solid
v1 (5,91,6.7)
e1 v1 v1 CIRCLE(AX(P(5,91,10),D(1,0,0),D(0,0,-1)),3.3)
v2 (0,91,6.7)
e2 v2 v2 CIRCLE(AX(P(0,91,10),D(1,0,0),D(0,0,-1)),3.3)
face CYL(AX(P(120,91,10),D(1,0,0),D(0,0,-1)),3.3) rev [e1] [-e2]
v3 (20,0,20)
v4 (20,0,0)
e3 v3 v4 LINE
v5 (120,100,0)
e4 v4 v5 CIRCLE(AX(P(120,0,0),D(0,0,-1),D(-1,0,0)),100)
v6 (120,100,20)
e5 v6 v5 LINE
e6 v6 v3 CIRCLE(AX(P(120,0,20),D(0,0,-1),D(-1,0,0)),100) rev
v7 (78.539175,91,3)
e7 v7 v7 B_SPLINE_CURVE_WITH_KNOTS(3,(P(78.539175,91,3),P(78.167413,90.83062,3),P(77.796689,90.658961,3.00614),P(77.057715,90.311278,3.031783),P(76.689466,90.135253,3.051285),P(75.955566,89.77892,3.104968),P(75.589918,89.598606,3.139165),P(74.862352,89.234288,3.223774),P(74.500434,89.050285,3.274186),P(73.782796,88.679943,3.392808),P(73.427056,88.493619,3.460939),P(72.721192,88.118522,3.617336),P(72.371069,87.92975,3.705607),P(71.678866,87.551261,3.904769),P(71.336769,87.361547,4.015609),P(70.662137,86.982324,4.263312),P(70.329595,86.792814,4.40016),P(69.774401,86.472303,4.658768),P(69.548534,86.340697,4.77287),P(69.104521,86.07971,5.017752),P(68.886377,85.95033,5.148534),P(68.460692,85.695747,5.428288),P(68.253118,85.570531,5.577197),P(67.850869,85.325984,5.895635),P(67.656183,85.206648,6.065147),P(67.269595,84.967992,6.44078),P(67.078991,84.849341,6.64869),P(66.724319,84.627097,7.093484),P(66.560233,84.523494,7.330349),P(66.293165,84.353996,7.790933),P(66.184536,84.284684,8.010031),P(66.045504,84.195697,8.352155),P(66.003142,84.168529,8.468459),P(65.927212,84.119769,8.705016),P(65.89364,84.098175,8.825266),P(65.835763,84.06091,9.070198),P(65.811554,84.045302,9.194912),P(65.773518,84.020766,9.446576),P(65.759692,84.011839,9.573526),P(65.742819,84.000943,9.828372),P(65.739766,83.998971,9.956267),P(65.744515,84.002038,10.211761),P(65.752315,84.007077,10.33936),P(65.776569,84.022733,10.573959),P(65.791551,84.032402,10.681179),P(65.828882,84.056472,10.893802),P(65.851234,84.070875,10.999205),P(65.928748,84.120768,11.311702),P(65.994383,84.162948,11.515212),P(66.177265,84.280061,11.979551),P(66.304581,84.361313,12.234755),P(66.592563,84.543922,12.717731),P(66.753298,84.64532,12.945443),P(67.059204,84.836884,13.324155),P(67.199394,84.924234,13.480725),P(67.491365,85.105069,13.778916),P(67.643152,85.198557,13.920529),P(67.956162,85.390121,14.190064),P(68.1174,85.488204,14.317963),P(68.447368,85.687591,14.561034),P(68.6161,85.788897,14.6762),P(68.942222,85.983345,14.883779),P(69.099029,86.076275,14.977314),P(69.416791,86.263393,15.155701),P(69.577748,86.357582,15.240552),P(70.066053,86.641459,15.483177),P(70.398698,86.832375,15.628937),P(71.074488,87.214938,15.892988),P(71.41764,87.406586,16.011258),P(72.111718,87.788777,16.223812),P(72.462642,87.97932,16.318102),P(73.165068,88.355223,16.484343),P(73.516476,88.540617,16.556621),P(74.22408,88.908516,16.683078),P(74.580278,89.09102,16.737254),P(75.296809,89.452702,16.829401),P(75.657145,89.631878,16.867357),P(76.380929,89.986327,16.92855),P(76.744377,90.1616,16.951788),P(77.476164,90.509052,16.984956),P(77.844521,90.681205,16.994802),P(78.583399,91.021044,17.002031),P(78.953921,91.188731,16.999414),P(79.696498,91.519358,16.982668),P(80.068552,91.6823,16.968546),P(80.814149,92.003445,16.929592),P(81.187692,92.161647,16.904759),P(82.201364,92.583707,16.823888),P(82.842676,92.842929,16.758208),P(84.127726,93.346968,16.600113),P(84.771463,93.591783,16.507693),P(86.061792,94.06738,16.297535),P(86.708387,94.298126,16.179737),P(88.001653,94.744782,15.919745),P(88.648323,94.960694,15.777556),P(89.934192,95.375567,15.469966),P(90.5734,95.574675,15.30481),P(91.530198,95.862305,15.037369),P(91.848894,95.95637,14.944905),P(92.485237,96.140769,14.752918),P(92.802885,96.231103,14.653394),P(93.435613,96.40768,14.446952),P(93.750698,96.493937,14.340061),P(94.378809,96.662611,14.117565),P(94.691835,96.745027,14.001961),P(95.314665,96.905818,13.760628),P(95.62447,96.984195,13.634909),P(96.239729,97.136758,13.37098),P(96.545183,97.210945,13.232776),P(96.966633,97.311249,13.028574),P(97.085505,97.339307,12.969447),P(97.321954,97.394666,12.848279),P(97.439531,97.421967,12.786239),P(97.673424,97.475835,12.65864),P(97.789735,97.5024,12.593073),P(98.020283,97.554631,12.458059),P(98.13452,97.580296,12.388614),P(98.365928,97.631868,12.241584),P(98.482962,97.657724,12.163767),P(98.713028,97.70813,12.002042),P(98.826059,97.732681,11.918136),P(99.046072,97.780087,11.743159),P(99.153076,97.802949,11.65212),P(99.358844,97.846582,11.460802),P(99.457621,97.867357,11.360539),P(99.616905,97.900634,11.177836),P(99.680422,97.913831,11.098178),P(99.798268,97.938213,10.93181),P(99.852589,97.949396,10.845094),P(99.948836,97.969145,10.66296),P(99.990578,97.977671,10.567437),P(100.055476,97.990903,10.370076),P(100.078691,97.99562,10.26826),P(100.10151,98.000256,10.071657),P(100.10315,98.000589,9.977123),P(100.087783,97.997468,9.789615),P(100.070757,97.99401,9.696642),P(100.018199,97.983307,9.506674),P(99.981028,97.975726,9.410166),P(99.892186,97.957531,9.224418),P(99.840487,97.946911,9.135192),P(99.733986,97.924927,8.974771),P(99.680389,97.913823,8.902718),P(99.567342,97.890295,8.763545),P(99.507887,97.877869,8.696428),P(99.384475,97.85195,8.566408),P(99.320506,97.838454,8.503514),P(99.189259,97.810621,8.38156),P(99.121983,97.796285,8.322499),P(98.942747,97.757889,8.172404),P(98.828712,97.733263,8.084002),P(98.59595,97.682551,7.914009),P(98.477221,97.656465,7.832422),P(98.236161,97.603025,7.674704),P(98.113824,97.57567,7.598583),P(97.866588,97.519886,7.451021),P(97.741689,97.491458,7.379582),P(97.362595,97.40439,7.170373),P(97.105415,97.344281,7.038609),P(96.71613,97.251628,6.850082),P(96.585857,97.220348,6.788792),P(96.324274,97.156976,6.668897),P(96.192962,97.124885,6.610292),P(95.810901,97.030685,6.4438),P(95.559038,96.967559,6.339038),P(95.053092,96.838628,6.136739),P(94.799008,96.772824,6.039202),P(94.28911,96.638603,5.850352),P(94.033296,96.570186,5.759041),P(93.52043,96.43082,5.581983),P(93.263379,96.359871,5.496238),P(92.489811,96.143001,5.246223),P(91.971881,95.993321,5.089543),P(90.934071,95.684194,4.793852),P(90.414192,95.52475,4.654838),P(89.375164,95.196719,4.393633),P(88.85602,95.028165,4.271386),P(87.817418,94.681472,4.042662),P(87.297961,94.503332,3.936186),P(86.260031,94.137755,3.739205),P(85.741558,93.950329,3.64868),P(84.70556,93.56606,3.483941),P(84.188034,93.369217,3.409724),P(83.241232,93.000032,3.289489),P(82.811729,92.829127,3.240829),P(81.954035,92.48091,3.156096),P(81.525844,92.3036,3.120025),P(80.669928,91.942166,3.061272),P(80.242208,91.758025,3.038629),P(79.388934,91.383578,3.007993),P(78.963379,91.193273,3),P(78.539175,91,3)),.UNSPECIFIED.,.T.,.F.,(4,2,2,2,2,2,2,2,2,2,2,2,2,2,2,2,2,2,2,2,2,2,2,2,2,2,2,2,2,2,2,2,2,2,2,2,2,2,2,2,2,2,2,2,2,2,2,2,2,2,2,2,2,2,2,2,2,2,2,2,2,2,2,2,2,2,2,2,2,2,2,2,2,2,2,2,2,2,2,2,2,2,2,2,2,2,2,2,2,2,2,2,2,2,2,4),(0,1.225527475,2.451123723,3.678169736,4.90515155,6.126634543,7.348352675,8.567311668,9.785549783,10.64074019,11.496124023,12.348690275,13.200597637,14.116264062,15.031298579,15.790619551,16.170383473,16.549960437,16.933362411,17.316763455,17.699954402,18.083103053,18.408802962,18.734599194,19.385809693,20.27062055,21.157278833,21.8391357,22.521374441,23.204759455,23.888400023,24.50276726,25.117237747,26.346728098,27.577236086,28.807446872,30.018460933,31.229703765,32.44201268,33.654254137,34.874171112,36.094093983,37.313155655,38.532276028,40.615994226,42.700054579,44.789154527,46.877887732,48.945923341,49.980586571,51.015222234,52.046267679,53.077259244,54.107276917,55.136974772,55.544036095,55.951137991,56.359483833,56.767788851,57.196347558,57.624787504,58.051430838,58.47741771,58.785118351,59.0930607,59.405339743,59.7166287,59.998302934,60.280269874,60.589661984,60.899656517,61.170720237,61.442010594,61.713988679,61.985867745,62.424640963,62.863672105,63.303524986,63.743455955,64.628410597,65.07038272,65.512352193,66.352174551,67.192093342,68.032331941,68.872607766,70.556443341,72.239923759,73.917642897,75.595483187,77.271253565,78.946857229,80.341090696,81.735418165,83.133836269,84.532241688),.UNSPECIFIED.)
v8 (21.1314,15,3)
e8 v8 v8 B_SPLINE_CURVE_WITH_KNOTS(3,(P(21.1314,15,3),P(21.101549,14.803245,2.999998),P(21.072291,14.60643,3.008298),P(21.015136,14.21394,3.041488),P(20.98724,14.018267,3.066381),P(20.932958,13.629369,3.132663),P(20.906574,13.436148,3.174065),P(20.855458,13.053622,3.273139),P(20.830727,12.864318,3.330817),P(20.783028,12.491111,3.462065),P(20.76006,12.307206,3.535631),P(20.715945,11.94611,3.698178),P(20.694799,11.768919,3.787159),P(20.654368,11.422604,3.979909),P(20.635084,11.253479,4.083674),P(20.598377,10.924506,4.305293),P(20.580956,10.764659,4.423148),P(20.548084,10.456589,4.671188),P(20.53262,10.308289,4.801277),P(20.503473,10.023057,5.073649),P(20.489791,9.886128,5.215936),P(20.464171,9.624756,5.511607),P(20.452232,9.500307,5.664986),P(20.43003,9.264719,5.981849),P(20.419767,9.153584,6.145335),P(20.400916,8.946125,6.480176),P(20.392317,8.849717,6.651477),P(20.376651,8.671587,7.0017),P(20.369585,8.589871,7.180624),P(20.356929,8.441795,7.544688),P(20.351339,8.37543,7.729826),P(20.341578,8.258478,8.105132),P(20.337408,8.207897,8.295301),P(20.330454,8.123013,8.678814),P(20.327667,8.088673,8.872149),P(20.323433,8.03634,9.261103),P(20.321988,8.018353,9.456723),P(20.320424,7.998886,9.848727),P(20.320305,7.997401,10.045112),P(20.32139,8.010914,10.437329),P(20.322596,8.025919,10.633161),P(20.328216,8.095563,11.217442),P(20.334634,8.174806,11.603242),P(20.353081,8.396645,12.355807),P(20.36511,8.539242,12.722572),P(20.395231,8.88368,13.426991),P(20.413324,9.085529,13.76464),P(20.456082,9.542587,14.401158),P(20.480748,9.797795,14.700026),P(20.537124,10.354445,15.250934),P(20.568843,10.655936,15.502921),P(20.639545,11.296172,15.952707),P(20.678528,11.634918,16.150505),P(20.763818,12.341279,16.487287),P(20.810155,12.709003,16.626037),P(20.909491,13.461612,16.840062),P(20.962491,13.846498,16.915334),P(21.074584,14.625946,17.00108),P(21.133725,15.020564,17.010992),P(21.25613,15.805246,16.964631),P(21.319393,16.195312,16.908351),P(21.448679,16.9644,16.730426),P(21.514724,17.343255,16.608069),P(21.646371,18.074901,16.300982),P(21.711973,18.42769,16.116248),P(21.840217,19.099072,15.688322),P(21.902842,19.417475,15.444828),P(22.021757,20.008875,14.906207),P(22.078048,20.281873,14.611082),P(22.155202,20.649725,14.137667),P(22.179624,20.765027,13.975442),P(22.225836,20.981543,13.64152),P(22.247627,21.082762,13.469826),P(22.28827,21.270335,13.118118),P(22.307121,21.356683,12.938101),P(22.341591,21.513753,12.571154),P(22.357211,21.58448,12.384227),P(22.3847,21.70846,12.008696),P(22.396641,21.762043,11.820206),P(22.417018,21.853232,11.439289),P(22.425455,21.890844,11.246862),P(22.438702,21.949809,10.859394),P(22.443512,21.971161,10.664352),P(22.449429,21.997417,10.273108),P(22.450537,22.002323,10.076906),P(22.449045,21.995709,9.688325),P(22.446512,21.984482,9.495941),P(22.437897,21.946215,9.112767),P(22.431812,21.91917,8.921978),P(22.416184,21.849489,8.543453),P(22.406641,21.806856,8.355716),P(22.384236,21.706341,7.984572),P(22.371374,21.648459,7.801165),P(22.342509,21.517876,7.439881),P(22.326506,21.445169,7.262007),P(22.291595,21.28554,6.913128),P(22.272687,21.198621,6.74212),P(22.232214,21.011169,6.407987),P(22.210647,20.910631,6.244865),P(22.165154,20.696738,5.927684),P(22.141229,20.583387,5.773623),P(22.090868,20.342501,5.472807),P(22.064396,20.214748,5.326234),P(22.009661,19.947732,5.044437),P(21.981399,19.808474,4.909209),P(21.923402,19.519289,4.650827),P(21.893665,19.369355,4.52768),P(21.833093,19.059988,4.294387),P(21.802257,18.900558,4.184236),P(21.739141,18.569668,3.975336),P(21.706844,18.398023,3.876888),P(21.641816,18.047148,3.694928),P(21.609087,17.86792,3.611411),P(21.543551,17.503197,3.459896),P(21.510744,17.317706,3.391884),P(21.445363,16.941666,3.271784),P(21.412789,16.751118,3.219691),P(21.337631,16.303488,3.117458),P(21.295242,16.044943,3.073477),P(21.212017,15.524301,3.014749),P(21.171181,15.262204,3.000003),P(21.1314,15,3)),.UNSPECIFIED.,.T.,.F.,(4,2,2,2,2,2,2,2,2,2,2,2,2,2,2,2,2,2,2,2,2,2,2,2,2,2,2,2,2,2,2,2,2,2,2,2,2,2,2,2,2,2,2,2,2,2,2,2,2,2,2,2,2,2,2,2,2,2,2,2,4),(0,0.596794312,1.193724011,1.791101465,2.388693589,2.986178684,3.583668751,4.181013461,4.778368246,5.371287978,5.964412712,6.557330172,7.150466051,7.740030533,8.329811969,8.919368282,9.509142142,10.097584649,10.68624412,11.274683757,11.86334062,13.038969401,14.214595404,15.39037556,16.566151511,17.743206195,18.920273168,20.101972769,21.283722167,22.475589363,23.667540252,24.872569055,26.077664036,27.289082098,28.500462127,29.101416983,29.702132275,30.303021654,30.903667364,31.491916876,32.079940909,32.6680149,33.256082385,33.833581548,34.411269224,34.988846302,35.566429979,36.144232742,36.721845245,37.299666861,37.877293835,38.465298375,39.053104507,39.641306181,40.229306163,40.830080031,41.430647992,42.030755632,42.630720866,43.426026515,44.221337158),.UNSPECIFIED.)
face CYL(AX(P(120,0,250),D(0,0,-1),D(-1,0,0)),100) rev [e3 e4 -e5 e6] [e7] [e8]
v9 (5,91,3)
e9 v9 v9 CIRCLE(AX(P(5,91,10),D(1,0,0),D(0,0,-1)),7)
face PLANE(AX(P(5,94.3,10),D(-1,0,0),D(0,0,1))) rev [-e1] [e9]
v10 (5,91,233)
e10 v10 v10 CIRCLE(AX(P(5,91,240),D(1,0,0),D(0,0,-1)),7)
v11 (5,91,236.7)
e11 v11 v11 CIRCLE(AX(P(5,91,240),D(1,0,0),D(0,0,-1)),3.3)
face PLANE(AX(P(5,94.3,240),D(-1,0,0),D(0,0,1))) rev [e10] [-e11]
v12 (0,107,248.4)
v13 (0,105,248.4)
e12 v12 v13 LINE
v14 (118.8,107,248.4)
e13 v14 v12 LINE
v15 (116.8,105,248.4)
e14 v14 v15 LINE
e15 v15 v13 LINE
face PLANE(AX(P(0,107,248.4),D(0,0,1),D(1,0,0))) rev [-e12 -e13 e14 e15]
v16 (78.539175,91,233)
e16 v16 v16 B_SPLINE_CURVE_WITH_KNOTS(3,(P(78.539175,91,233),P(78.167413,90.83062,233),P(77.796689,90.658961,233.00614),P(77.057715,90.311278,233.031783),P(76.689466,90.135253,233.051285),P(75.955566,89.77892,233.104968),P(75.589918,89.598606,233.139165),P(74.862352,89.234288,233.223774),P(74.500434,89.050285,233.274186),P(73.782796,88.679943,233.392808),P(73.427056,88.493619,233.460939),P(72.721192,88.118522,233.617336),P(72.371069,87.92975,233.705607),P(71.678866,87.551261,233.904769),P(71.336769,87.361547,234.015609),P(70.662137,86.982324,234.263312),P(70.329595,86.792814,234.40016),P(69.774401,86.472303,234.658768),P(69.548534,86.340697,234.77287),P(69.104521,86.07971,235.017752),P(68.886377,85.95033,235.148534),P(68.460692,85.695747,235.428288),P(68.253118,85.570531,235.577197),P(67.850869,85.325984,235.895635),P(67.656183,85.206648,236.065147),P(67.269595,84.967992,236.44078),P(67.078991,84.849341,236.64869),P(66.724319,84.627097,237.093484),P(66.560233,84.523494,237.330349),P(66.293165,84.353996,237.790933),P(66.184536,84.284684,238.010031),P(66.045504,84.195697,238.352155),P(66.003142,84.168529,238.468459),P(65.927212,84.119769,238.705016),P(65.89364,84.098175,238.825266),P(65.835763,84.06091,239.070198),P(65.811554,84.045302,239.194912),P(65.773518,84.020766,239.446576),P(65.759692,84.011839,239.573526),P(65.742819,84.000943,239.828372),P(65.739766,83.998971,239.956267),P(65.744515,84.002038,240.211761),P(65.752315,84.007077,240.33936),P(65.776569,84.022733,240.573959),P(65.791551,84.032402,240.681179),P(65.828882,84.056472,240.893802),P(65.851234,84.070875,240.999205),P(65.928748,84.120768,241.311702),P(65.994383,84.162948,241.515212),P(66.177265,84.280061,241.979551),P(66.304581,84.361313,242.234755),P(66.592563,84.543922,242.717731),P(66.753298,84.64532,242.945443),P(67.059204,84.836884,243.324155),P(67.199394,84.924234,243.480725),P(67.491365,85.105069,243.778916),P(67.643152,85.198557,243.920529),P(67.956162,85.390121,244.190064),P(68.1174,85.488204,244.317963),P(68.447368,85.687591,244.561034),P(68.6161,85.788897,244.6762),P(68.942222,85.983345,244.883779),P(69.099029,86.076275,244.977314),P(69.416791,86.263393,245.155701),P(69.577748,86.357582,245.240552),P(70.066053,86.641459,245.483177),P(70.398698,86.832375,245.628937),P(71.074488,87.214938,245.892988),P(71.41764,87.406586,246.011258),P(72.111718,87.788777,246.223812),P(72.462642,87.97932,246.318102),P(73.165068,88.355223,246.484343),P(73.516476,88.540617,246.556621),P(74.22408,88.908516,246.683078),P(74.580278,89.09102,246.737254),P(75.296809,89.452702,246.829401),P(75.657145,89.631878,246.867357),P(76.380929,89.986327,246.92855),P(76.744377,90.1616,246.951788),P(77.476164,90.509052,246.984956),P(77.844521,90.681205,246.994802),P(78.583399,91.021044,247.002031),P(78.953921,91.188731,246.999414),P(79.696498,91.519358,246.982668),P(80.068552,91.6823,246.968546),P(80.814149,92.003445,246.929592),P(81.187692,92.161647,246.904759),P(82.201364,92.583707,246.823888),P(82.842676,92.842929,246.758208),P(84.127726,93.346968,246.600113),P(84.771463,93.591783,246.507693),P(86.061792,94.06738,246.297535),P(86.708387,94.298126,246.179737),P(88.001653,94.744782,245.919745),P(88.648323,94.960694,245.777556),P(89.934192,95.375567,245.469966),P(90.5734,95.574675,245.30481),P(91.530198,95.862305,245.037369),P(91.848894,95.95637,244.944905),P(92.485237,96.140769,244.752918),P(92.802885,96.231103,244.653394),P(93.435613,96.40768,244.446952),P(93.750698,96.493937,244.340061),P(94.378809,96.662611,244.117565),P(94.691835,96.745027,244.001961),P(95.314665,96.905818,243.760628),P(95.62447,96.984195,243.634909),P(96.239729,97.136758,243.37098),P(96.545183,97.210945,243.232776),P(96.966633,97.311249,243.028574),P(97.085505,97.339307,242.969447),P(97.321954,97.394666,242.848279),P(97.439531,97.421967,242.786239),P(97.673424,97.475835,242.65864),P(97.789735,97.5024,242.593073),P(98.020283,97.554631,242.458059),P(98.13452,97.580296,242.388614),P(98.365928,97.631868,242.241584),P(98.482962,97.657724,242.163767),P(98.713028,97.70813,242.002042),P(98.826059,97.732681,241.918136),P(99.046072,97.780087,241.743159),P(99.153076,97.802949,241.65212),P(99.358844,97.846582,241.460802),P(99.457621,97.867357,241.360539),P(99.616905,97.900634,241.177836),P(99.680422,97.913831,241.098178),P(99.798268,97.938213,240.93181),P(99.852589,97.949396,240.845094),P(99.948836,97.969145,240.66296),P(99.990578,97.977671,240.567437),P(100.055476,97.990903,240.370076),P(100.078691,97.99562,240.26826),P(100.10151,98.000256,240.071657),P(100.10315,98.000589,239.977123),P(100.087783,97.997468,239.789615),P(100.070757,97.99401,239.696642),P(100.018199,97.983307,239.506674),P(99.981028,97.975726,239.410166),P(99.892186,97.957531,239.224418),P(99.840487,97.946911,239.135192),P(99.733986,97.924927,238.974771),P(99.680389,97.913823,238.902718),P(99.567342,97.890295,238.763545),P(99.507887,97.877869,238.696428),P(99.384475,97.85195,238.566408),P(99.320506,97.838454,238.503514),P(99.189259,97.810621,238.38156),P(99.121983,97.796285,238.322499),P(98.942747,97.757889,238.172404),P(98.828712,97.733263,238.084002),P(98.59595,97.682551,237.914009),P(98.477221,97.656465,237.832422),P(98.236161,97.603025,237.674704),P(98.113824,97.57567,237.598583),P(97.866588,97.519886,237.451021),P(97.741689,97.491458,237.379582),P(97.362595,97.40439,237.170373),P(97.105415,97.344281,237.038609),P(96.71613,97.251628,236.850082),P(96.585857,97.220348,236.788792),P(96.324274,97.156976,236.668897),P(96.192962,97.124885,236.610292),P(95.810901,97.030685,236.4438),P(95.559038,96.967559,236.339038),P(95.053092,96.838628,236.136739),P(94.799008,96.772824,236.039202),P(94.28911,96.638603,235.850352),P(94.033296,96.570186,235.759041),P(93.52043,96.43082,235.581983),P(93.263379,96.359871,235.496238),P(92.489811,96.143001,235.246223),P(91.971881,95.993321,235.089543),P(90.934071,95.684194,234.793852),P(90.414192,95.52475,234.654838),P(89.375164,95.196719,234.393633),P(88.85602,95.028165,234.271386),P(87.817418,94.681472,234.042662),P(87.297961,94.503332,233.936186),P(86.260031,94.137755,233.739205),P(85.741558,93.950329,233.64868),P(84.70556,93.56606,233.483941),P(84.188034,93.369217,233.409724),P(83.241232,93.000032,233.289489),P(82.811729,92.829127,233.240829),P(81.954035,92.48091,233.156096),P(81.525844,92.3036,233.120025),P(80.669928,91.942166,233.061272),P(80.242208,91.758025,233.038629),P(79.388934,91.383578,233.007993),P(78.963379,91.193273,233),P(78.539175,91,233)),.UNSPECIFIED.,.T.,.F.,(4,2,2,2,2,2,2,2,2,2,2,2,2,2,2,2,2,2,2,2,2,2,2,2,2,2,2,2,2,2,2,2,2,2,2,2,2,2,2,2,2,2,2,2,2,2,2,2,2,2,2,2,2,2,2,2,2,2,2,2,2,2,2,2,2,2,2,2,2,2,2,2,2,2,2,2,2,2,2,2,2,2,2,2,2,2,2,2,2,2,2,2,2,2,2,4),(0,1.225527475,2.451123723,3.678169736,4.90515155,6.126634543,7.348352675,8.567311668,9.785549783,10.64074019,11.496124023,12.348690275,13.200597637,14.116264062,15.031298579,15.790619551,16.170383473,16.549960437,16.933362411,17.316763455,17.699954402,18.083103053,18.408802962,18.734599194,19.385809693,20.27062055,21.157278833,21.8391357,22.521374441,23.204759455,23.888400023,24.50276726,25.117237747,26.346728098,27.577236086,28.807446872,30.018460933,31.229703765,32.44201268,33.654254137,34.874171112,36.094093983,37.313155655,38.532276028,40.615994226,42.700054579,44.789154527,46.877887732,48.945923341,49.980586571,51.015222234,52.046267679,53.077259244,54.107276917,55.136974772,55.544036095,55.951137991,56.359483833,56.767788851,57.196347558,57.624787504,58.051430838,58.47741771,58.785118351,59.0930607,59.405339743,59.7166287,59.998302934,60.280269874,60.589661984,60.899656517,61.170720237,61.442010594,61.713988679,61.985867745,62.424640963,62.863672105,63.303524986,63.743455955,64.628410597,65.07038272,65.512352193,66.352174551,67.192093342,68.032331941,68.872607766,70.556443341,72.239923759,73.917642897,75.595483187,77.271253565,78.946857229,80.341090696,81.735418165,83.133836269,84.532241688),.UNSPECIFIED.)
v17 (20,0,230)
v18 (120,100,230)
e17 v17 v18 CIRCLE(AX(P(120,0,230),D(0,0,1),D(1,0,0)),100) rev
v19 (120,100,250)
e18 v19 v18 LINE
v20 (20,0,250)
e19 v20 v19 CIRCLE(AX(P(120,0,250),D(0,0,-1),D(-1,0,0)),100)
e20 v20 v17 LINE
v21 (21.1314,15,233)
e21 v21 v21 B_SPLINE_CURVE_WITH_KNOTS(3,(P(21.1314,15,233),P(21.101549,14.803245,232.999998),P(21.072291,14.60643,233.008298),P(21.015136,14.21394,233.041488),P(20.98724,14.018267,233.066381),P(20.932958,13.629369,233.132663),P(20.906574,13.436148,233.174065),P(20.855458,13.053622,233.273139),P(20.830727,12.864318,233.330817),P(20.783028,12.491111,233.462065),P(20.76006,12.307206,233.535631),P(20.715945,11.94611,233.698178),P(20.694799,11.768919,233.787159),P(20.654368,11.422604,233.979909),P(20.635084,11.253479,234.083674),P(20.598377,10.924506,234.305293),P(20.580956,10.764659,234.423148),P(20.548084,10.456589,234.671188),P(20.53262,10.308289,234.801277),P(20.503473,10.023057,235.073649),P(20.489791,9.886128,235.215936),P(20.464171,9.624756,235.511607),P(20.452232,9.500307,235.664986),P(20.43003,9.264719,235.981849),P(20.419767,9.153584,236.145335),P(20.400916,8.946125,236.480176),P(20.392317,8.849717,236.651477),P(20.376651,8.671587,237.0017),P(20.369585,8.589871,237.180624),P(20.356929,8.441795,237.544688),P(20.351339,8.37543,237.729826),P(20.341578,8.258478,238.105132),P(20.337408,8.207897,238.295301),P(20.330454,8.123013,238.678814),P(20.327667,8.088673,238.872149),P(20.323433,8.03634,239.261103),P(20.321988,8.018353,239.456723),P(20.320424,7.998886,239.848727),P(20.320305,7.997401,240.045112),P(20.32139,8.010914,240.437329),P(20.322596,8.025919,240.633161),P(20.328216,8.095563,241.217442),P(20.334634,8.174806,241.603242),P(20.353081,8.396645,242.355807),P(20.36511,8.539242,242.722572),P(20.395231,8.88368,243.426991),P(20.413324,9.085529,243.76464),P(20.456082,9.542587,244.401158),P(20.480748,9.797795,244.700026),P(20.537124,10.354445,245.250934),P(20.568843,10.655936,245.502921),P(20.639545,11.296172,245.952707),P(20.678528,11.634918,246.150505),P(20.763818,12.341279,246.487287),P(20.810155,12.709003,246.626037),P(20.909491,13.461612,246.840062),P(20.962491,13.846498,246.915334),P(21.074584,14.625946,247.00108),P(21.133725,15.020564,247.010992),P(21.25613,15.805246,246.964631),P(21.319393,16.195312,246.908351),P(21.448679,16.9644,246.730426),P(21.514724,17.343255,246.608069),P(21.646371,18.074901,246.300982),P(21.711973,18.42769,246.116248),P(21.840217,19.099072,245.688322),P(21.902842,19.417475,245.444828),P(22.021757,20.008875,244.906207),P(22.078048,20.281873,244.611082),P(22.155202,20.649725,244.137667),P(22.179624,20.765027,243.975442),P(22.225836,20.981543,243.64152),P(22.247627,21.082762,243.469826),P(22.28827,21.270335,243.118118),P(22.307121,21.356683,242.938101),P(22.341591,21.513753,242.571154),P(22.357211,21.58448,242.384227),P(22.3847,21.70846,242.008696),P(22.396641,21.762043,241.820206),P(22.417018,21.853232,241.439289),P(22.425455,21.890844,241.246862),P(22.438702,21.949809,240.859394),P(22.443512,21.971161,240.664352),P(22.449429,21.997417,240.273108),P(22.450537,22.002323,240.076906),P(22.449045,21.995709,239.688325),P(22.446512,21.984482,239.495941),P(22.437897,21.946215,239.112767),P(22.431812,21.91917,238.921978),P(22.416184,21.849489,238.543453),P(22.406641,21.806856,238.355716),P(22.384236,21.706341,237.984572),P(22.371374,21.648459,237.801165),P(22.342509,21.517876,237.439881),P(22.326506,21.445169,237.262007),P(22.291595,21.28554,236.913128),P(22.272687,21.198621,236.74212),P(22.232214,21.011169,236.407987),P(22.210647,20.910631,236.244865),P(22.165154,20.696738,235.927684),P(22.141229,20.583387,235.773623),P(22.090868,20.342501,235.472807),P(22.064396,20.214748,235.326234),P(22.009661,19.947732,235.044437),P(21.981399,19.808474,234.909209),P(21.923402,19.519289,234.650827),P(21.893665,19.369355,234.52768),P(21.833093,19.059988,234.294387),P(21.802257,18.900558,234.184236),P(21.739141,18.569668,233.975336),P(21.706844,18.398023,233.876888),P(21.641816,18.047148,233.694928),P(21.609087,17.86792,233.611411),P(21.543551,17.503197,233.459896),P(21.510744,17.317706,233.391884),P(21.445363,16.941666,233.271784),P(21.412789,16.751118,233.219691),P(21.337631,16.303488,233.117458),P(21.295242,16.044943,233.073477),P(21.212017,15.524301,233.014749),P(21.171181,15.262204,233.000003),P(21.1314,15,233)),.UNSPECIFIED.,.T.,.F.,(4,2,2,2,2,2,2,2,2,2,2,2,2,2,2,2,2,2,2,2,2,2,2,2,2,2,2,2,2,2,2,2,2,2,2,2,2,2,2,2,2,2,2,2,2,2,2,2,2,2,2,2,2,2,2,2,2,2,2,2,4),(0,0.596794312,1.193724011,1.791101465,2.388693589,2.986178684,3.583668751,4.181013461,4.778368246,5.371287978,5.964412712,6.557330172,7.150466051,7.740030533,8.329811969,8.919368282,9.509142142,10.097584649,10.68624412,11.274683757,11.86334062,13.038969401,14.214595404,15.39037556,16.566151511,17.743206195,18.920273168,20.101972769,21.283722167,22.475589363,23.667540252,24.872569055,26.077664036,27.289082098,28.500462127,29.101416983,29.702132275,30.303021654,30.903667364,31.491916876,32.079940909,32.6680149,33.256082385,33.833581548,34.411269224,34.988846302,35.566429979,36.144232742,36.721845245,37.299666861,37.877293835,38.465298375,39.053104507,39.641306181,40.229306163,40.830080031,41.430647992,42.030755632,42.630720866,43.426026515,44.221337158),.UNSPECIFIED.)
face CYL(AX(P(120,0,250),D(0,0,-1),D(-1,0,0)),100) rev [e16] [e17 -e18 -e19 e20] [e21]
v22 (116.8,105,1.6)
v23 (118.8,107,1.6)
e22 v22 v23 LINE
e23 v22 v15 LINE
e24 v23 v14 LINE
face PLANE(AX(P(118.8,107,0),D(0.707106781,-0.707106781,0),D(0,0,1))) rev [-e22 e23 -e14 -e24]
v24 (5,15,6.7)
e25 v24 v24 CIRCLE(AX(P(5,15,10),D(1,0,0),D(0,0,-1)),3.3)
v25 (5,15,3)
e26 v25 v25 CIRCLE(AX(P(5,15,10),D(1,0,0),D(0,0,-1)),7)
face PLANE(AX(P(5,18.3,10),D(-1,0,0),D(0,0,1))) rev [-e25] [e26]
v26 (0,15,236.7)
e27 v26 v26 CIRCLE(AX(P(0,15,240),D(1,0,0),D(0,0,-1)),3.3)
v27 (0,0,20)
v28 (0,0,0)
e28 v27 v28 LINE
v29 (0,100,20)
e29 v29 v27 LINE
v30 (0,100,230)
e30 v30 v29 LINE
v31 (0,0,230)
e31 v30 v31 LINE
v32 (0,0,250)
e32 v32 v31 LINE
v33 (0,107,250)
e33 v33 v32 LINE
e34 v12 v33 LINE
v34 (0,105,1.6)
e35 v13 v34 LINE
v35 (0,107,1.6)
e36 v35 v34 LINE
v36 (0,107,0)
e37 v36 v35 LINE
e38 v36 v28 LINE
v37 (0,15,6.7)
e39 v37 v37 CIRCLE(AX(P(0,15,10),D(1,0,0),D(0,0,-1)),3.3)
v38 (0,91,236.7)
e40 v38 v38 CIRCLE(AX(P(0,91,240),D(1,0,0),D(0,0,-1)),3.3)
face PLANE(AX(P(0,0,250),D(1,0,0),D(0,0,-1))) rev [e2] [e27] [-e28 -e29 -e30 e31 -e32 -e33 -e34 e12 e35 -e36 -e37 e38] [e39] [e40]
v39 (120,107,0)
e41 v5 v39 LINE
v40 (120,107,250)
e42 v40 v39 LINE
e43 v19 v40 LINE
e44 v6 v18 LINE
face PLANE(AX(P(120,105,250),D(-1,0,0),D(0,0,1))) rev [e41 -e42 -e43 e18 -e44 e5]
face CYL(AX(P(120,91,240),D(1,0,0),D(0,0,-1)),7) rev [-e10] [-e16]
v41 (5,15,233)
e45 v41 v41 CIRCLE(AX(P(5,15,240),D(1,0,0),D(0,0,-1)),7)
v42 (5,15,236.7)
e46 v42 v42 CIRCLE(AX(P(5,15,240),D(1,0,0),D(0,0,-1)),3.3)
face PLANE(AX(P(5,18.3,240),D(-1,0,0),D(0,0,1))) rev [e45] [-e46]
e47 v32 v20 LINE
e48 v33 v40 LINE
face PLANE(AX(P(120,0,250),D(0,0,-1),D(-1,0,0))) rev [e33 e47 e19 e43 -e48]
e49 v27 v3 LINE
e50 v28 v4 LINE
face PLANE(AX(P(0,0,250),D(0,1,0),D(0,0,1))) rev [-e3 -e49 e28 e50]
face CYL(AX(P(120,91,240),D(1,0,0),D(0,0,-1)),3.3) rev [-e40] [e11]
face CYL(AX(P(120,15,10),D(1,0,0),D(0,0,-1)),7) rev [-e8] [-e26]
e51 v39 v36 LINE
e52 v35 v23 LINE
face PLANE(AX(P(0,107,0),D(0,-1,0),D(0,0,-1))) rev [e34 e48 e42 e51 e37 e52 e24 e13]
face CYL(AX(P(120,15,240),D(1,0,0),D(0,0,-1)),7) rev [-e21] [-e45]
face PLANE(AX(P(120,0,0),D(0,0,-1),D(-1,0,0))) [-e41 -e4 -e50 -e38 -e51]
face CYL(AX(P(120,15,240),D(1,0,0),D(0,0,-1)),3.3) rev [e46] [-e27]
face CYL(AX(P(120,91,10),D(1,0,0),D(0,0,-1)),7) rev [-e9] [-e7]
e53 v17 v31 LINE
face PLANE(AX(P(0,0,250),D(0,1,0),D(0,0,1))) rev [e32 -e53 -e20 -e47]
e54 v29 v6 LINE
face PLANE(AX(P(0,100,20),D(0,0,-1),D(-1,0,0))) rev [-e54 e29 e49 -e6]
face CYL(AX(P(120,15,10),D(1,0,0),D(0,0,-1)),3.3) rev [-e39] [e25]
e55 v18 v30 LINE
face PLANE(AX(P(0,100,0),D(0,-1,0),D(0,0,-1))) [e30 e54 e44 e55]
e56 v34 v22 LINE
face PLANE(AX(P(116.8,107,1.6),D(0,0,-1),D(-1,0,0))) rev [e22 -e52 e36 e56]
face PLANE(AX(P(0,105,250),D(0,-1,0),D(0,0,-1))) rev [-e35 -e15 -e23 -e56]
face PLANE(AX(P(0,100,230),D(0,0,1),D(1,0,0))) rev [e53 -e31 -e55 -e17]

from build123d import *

# Parameters (mm, degrees)
P_IDAT_VYSUNUT_M1_DEPTH                           = 250
SKICA2_W                                          = 120
SKICA2_H                                          = 210
ODEBRAT_VYSUNUT_M1_DEPTH                          = 100
V_LCOV_ZAHLOUBEN_PRO_M6_ROUBY_S_V_LCO_D           = 6.6
V_LCOV_ZAHLOUBEN_PRO_M6_ROUBY_S_V_LCO_CBORE_D     = 14
V_LCOV_ZAHLOUBEN_PRO_M6_ROUBY_S_V_LCO_CBORE_DEPTH = 115
P_IDAT_VYSUNUT_M2_DEPTH                           = 2
ZKOSEN_1_SIZE                                     = 2


with BuildPart() as part:
    # Skica1 → Přidat vysunutím1 (new body)
    with BuildSketch(Plane.XY):
        with BuildLine():
            Line((0, 0), (0, 105))
            Line((0, 105), (120, 105))
            Line((120, 105), (120, 100))
            ThreePointArc((120, 100), (49.289321881, 70.710678119), (20, 0))
            Line((20, 0), (0, 0))
        make_face()
    extrude(amount=P_IDAT_VYSUNUT_M1_DEPTH)

    # Skica2 → Odebrat vysunutím1 (cut)
    with BuildSketch(Plane.XZ):
        with Locations((60, 125)):
            Rectangle(SKICA2_W, SKICA2_H)
    extrude(amount=-ODEBRAT_VYSUNUT_M1_DEPTH, mode=Mode.SUBTRACT)

    # Válcové zahloubení pro M6 šrouby s válcovou hlavou zaoblenou1 (through all)
    with Locations(Plane(origin=(120, 0, 0), x_dir=(0, 0, -1), z_dir=(1, 0, 0))):
        with Locations((-240, 91), (-240, 15)):
            v_lcov_zahlouben_pro_m6_rouby_s_v_lco = CounterBoreHole(V_LCOV_ZAHLOUBEN_PRO_M6_ROUBY_S_V_LCO_D / 2, V_LCOV_ZAHLOUBEN_PRO_M6_ROUBY_S_V_LCO_CBORE_D / 2, V_LCOV_ZAHLOUBEN_PRO_M6_ROUBY_S_V_LCO_CBORE_DEPTH)

    # Zrcadlit1: Válcové zahloubení pro M6 šrouby s válcovou hlavou zaoblenou1 across plane
    add(v_lcov_zahlouben_pro_m6_rouby_s_v_lco.mirror(Plane.XY.offset(125)), mode=Mode.SUBTRACT)

    # Skica8 → Přidat vysunutím2 (add)
    with BuildSketch(Plane(origin=(0, 105, 0), x_dir=(1, 0, 0), z_dir=(0, 1, 0))):
        Polygon((0, 0), (120, 0), (120, -250), (0, -250), (0, -248.4), (116.8, -248.4), (116.8, -1.6), (0, -1.6), align=None)
    extrude(amount=P_IDAT_VYSUNUT_M2_DEPTH)

    # Zkosení1
    zkosen_1_edges = [part.edges().sort_by_distance(p)[0] for p in [
        (116.8, 107, 125),
    ]]
    chamfer(zkosen_1_edges, length=ZKOSEN_1_SIZE - 0.0001)  # a hair under: the kernel refuses the full size


solid = part.part
